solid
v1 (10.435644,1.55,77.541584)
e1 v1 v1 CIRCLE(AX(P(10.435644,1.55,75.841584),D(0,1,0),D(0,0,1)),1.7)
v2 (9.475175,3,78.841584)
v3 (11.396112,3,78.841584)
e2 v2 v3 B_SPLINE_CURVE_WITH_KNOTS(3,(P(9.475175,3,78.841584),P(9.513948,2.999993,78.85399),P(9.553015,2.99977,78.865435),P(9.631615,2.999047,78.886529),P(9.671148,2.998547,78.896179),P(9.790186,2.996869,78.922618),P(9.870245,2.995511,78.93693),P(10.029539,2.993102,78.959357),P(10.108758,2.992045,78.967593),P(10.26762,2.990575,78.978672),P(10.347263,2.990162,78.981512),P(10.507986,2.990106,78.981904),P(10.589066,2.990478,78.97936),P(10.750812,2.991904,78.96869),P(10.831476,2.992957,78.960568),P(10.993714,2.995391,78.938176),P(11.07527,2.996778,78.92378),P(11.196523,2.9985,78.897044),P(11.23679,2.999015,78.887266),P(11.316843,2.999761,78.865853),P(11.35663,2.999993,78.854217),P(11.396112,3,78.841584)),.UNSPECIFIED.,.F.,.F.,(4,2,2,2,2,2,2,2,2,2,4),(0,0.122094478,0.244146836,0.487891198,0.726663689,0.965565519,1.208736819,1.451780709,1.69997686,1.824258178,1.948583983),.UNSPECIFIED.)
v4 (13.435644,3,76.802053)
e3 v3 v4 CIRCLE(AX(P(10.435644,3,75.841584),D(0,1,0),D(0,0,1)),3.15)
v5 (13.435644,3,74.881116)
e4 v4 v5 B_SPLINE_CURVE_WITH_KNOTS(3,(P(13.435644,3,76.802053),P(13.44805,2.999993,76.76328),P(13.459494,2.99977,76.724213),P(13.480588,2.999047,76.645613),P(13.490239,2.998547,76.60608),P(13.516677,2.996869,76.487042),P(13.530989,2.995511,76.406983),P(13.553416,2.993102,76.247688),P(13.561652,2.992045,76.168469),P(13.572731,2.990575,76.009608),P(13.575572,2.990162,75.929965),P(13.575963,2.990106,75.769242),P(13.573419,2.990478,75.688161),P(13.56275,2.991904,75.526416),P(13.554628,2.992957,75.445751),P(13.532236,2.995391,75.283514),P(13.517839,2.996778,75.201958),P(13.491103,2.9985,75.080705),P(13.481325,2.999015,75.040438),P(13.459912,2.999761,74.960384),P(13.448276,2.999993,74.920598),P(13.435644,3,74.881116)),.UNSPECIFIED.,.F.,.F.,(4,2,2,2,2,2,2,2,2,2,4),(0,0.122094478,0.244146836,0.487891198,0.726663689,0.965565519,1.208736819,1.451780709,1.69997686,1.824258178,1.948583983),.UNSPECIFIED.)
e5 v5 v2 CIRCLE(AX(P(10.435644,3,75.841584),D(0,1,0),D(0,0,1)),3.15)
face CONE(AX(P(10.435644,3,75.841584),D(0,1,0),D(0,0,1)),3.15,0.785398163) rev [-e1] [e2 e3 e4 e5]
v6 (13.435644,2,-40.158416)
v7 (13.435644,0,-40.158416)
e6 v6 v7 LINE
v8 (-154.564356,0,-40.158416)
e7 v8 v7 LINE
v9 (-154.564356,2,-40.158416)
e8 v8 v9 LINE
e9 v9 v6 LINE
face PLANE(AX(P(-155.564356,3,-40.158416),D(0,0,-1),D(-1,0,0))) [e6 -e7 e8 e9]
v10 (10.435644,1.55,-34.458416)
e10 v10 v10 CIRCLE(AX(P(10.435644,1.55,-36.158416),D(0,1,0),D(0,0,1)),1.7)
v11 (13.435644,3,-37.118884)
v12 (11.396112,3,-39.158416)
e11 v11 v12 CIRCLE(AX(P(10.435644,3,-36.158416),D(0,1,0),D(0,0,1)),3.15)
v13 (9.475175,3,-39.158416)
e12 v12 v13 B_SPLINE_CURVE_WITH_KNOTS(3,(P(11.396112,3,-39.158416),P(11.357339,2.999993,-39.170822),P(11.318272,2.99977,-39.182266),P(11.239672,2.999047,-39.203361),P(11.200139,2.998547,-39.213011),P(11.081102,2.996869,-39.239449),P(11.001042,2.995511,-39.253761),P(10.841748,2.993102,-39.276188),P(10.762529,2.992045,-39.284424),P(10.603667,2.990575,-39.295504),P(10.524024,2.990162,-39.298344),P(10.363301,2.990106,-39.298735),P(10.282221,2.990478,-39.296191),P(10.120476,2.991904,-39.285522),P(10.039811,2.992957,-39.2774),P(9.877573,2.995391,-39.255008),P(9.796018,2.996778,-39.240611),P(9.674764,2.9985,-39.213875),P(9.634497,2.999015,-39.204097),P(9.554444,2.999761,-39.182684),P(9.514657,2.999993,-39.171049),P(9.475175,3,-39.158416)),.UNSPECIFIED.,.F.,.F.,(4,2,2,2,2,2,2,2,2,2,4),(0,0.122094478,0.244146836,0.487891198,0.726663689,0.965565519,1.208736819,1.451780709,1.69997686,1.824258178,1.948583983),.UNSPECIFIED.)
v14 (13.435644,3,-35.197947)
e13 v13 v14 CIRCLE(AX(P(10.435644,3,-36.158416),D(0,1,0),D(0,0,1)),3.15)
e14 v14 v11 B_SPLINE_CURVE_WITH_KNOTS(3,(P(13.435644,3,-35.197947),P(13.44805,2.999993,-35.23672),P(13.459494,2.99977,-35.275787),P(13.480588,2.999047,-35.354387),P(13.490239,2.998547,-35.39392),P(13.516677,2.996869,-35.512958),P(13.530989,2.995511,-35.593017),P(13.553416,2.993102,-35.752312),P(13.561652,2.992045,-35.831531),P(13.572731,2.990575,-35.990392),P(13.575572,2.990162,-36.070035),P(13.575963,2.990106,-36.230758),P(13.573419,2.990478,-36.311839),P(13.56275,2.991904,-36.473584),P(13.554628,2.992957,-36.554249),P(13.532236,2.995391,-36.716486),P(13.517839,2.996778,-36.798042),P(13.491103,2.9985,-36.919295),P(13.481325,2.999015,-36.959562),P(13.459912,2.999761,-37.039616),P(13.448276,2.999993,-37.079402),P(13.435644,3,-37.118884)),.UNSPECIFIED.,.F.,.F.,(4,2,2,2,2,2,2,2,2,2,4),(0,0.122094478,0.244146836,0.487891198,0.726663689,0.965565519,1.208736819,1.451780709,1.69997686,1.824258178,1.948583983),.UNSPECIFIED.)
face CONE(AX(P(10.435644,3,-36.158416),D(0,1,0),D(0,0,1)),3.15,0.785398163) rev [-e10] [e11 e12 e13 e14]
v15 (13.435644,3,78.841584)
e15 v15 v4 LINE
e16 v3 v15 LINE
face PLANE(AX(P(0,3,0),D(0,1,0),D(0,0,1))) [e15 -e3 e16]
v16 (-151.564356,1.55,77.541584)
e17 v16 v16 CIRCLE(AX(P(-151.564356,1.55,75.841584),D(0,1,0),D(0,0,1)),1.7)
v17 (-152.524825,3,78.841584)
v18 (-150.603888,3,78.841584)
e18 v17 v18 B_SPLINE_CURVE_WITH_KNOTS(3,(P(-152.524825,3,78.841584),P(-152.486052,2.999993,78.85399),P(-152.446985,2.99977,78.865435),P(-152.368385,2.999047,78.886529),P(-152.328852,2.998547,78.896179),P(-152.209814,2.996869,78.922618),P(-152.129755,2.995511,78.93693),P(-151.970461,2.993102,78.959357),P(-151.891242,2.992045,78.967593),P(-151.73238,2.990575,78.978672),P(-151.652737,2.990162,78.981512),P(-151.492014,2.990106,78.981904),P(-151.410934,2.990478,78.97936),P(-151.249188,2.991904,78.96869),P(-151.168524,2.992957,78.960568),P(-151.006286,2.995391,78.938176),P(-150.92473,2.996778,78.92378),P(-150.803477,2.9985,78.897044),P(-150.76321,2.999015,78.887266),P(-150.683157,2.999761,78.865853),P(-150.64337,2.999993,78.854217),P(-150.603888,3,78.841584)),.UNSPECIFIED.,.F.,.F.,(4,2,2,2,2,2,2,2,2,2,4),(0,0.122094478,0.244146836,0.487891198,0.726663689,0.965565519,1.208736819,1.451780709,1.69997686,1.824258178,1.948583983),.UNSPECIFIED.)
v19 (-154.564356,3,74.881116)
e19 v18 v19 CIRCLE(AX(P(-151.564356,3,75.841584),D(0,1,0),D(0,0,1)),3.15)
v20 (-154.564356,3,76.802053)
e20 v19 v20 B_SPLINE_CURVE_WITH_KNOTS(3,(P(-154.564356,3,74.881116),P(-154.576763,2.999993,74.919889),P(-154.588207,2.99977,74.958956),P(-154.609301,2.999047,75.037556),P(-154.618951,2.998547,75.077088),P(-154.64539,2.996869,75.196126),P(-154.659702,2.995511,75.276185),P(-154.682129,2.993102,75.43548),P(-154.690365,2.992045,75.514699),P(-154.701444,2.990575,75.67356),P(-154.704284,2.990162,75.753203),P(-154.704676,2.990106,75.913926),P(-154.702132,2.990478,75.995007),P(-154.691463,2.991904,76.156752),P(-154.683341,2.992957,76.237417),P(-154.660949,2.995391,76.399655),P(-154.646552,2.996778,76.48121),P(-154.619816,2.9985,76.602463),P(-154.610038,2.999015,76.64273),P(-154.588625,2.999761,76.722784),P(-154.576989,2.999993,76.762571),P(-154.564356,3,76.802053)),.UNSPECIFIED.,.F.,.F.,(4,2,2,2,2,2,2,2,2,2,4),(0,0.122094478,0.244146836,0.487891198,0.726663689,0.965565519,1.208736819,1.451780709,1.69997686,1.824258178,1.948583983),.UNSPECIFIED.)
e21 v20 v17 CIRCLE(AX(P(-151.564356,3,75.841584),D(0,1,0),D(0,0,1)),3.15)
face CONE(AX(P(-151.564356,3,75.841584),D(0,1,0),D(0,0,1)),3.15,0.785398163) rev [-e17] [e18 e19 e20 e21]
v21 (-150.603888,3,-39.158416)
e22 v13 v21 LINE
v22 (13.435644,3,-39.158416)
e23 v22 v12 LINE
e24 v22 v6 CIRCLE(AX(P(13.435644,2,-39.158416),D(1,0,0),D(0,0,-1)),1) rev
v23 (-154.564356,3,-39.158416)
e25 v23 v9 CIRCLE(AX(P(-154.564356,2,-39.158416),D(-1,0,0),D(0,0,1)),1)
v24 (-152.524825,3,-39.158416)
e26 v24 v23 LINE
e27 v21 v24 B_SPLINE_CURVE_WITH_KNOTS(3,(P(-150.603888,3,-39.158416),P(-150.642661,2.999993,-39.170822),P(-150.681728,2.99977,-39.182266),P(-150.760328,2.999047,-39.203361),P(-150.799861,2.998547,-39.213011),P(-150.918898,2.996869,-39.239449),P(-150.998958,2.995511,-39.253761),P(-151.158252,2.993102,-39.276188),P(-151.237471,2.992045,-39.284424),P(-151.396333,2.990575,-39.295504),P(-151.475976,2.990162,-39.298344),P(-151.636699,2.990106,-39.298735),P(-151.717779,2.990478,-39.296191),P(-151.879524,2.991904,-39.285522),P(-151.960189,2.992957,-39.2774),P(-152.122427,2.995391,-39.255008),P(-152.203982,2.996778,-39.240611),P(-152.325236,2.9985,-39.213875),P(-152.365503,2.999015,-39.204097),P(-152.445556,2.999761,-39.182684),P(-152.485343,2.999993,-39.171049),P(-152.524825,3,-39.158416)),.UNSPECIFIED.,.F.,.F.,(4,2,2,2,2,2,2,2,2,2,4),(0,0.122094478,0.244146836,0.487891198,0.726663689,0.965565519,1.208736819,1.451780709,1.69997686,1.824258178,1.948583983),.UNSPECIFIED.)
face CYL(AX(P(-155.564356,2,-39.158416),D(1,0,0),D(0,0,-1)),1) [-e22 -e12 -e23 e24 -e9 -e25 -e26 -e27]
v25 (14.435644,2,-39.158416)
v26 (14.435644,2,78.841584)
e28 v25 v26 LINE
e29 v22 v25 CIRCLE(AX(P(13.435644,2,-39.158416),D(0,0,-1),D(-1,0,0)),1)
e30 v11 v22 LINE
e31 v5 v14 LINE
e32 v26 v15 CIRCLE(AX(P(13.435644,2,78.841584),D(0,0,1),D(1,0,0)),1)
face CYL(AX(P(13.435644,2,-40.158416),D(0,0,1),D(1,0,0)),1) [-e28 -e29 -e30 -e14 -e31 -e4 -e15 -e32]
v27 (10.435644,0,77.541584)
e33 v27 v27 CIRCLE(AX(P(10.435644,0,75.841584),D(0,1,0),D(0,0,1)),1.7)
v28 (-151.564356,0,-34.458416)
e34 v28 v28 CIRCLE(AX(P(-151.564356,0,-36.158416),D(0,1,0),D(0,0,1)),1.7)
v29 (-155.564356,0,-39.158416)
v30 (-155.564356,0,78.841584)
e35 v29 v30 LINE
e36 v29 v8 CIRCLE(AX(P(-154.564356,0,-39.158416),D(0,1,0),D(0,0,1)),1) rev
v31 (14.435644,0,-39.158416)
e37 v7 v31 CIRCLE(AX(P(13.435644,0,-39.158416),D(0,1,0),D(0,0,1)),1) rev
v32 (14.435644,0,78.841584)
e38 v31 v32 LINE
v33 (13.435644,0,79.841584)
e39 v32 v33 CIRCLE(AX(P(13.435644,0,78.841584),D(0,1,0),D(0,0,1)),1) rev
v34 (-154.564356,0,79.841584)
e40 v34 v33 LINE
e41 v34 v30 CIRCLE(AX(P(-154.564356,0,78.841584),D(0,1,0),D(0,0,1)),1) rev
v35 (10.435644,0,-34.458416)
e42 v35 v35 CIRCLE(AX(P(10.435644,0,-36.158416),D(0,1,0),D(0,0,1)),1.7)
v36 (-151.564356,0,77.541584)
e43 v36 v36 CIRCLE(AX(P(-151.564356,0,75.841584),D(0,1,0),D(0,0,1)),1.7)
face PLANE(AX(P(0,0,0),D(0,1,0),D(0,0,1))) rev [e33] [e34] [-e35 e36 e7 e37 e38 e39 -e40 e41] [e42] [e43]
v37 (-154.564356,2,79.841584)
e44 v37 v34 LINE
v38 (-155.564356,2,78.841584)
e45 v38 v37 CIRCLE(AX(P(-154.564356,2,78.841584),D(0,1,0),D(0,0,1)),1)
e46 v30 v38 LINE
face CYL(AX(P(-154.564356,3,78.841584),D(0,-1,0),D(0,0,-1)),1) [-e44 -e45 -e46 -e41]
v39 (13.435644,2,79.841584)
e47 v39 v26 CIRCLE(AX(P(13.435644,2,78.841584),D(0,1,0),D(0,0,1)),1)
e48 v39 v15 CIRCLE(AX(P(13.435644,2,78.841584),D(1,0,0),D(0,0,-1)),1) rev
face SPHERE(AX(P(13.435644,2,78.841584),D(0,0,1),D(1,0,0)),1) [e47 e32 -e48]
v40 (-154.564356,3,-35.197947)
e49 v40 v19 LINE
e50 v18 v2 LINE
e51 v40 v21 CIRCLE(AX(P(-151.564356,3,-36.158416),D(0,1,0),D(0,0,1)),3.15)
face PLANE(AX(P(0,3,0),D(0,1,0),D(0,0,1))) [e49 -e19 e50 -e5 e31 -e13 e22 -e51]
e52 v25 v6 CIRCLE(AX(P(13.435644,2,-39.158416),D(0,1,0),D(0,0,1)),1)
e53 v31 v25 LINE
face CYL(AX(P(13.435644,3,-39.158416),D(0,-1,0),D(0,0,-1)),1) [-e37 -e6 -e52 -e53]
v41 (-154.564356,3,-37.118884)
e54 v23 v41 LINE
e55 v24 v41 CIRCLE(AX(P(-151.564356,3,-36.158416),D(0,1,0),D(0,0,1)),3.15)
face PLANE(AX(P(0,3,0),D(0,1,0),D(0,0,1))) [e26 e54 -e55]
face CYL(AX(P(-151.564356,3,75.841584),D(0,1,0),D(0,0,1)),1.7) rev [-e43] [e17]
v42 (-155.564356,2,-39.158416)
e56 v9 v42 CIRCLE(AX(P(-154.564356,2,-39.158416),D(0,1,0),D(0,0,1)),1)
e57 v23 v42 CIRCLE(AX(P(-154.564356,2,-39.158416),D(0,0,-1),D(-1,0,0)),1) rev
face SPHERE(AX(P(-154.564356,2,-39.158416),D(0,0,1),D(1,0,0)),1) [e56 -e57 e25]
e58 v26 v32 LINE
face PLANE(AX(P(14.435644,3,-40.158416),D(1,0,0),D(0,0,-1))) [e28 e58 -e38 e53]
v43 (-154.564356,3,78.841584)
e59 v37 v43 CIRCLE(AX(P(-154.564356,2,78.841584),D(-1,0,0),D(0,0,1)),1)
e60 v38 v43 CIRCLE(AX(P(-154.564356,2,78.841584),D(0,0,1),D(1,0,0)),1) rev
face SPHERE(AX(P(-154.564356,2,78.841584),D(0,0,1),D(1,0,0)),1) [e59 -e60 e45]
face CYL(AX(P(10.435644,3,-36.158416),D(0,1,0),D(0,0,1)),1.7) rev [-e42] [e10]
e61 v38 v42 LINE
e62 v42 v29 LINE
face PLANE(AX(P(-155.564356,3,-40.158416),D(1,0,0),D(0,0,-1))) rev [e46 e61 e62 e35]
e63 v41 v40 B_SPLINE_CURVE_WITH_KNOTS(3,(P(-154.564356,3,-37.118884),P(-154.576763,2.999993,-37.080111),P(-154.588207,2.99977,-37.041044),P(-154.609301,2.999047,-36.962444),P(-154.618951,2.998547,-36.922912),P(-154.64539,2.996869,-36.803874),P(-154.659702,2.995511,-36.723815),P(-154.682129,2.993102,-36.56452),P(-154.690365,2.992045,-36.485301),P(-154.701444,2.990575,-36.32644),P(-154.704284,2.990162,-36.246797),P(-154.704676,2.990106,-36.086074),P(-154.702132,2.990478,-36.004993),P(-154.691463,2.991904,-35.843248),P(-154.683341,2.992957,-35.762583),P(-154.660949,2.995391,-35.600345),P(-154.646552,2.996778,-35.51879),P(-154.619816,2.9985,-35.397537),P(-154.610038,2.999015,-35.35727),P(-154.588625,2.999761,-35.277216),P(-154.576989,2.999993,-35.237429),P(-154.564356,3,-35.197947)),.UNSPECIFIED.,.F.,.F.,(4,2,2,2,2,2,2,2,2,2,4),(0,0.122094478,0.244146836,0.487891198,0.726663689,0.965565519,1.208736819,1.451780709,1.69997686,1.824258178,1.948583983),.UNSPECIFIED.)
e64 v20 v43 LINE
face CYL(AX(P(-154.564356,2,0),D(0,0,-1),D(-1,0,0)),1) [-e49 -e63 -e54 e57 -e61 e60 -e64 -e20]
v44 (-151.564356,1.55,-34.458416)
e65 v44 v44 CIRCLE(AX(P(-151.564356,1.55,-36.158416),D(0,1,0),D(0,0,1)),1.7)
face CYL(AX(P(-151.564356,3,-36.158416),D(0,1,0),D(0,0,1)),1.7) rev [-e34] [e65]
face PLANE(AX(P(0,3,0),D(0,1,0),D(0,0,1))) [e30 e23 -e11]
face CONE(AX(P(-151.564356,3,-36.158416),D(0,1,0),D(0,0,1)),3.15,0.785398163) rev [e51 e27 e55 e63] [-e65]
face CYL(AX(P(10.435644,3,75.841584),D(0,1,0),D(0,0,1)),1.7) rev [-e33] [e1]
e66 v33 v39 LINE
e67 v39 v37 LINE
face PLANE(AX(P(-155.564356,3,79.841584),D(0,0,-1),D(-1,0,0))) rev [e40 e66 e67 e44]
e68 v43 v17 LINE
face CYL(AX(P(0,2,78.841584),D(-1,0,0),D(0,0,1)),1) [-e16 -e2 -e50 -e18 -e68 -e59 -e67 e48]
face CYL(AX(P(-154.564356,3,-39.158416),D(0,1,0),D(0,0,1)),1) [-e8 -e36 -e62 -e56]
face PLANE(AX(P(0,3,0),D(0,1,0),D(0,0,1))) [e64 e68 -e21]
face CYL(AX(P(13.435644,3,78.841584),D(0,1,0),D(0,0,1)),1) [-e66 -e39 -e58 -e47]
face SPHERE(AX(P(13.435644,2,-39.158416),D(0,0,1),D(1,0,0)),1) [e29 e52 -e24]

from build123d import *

# Parameters (mm, degrees)
SKETCH1_W                                      = 170
SKETCH1_H                                      = 120
BOSS_EXTRUDE1_DEPTH                            = 3
CSK_FOR_M3_FLAT_HEAD_MACHINE_SCREW1_AT_2_COUNT = 2
CSK_FOR_M3_FLAT_HEAD_MACHINE_SCREW1_AT_2_PITCH = 162
CSK_FOR_M3_FLAT_HEAD_MACHINE_SCREW1_AT_3_COUNT = 2
CSK_FOR_M3_FLAT_HEAD_MACHINE_SCREW1_AT_3_PITCH = 196.946693295
CSK_FOR_M3_FLAT_HEAD_MACHINE_SCREW1_AT_4_COUNT = 2
CSK_FOR_M3_FLAT_HEAD_MACHINE_SCREW1_AT_4_PITCH = 112
FILLET2_R                                      = 1


with BuildPart() as part:
    # Sketch1 → Boss-Extrude1 (new body)
    with BuildSketch(Plane(origin=(0, 0, 0), x_dir=(1, 0, 0), z_dir=(0, 1, 0))):
        with Locations((-70.564356436, -19.841584158)):
            Rectangle(SKETCH1_W, SKETCH1_H)
    extrude(amount=BOSS_EXTRUDE1_DEPTH)

    # Sketch4 → CSK for M3 Flat Head Machine Screw1 (revolve, cut)
    with BuildSketch(Plane(origin=(-151.564356436, 3, -36.158415842), x_dir=(0, 0, 1), z_dir=(1, 0, 0))):
        Polygon((0, 0), (0, 3), (1.7, 3), (1.7, 1.45), (3.15, 0), align=None)
    csk_for_m3_flat_head_machine_screw1 = revolve(axis=Axis((-151.564356436, 9.35, -36.158415842), (0, -1, 0)), mode=Mode.SUBTRACT)

    # CSK for M3 Flat Head Machine Screw1 at 2: CSK for M3 Flat Head Machine Screw1 ×2
    with Locations(*[(i * CSK_FOR_M3_FLAT_HEAD_MACHINE_SCREW1_AT_2_PITCH, 0, 0) for i in range(1, CSK_FOR_M3_FLAT_HEAD_MACHINE_SCREW1_AT_2_COUNT)]):
        add(csk_for_m3_flat_head_machine_screw1, mode=Mode.SUBTRACT)

    # CSK for M3 Flat Head Machine Screw1 at 3: CSK for M3 Flat Head Machine Screw1 ×2
    with Locations(*[Vector(0.8225576032241401, 0, 0.5686817997598994) * (i * CSK_FOR_M3_FLAT_HEAD_MACHINE_SCREW1_AT_3_PITCH) for i in range(1, CSK_FOR_M3_FLAT_HEAD_MACHINE_SCREW1_AT_3_COUNT)]):
        add(csk_for_m3_flat_head_machine_screw1, mode=Mode.SUBTRACT)

    # CSK for M3 Flat Head Machine Screw1 at 4: CSK for M3 Flat Head Machine Screw1 ×2
    with Locations(*[(0, 0, i * CSK_FOR_M3_FLAT_HEAD_MACHINE_SCREW1_AT_4_PITCH) for i in range(1, CSK_FOR_M3_FLAT_HEAD_MACHINE_SCREW1_AT_4_COUNT)]):
        add(csk_for_m3_flat_head_machine_screw1, mode=Mode.SUBTRACT)

    # Fillet2
    # the kernel refuses this fillet: 1 mm, written as the material it takes off along each edge
    with BuildSketch(Plane(origin=(13.435643564, 2, -39.158415842), x_dir=(1, 0, 0), z_dir=(0, 0, -1))) as fillet2_piece_1_section:
        Polygon((0, 0), (FILLET2_R, 0), (FILLET2_R, -FILLET2_R), (0, -FILLET2_R), align=None)
    fillet2_piece_1 = extrude(amount=FILLET2_R, mode=Mode.PRIVATE)
    fillet2_piece_1 = fillet2_piece_1 - Plane(origin=(13.435643564, 2, -39.158415842), x_dir=(-0.7071067811865475, -0.7071067811865475, 0), z_dir=(0, 0, -1)) * Sphere(FILLET2_R, mode=Mode.PRIVATE)
    add(fillet2_piece_1, mode=Mode.SUBTRACT)
    with BuildSketch(Plane(origin=(13.435643564, 2, 78.841584158), x_dir=(0, 1, 0), z_dir=(1, 0, 0))) as fillet2_piece_2_section:
        Polygon((0, 0), (FILLET2_R, 0), (FILLET2_R, FILLET2_R), (0, FILLET2_R), align=None)
    fillet2_piece_2 = extrude(amount=FILLET2_R, mode=Mode.PRIVATE)
    fillet2_piece_2 = fillet2_piece_2 - Plane(origin=(13.435643564, 2, 78.841584158), x_dir=(0, -0.7071067811865475, -0.7071067811865475), z_dir=(1, 0, 0)) * Sphere(FILLET2_R, mode=Mode.PRIVATE)
    add(fillet2_piece_2, mode=Mode.SUBTRACT)
    with BuildSketch(Plane(origin=(-154.564356436, 2, -39.158415842), x_dir=(-1, 0, 0), z_dir=(0, 0, -1))) as fillet2_piece_3_section:
        Polygon((0, 0), (FILLET2_R, 0), (FILLET2_R, FILLET2_R), (0, FILLET2_R), align=None)
    fillet2_piece_3 = extrude(amount=FILLET2_R, mode=Mode.PRIVATE)
    fillet2_piece_3 = fillet2_piece_3 - Plane(origin=(-154.564356436, 2, -39.158415842), x_dir=(0.7071067811865475, -0.7071067811865475, 0), z_dir=(0, 0, -1)) * Sphere(FILLET2_R, mode=Mode.PRIVATE)
    add(fillet2_piece_3, mode=Mode.SUBTRACT)
    with BuildSketch(Plane(origin=(-154.564356436, 2, 78.841584158), x_dir=(0, 1, 0), z_dir=(-1, 0, 0))) as fillet2_piece_4_section:
        Polygon((0, 0), (FILLET2_R, 0), (FILLET2_R, -FILLET2_R), (0, -FILLET2_R), align=None)
    fillet2_piece_4 = extrude(amount=FILLET2_R, mode=Mode.PRIVATE)
    fillet2_piece_4 = fillet2_piece_4 - Plane(origin=(-154.564356436, 2, 78.841584158), x_dir=(0, -0.7071067811865475, -0.7071067811865475), z_dir=(-1, 0, 0)) * Sphere(FILLET2_R, mode=Mode.PRIVATE)
    add(fillet2_piece_4, mode=Mode.SUBTRACT)
    with BuildSketch(Plane(origin=(14.435643564, 3, -39.158415842), x_dir=(0, -1, 0), z_dir=(0, 0, 1)), Plane(origin=(-155.564356436, 3, 78.841584158), x_dir=(0, -1, 0), z_dir=(0, 0, -1))) as fillet2_piece_5:
        with BuildLine():
            CenterArc((FILLET2_R, -FILLET2_R), FILLET2_R, 90, 90)
            Line((0, -FILLET2_R), (0, 0))
            Line((0, 0), (FILLET2_R, 0))
        make_face()
    extrude(amount=118, mode=Mode.SUBTRACT)
    with BuildSketch(Plane(origin=(-154.564356436, 3, -40.158415842), x_dir=(0, -1, 0), z_dir=(1, 0, 0))) as fillet2_piece_6:
        with BuildLine():
            CenterArc((FILLET2_R, -FILLET2_R), FILLET2_R, 90, 90)
            Line((0, -FILLET2_R), (0, 0))
            Line((0, 0), (FILLET2_R, 0))
        make_face()
    extrude(amount=168, mode=Mode.SUBTRACT)
    with BuildSketch(Plane(origin=(-155.564356436, -2.5, -40.158415842), x_dir=(1, 0, 0), z_dir=(0, 1, 0)), Plane(origin=(-155.564356436, -2.5, 79.841584158), x_dir=(0, 0, -1), z_dir=(0, 1, 0))) as fillet2_piece_7:
        with BuildLine():
            CenterArc((FILLET2_R, -FILLET2_R), FILLET2_R, 90, 90)
            Line((0, -FILLET2_R), (0, 0))
            Line((0, 0), (FILLET2_R, 0))
        make_face()
    extrude(amount=4.5, mode=Mode.SUBTRACT)
    with BuildSketch(Plane(origin=(14.435643564, -2.5, -40.158415842), x_dir=(-1, 0, 0), z_dir=(0, 1, 0)), Plane(origin=(14.435643564, -2.5, 79.841584158), x_dir=(0, 0, -1), z_dir=(0, 1, 0))) as fillet2_piece_8:
        with BuildLine():
            CenterArc((FILLET2_R, FILLET2_R), FILLET2_R, 180, 90)
            Line((0, FILLET2_R), (0, 0))
            Line((0, 0), (FILLET2_R, 0))
        make_face()
    extrude(amount=4.5, mode=Mode.SUBTRACT)
    with BuildSketch(Plane(origin=(13.435643564, 3, 79.841584158), x_dir=(0, 0, -1), z_dir=(-1, 0, 0))) as fillet2_piece_9:
        with BuildLine():
            CenterArc((FILLET2_R, FILLET2_R), FILLET2_R, 180, 90)
            Line((0, FILLET2_R), (0, 0))
            Line((0, 0), (FILLET2_R, 0))
        make_face()
    extrude(amount=168, mode=Mode.SUBTRACT)


solid = part.part
